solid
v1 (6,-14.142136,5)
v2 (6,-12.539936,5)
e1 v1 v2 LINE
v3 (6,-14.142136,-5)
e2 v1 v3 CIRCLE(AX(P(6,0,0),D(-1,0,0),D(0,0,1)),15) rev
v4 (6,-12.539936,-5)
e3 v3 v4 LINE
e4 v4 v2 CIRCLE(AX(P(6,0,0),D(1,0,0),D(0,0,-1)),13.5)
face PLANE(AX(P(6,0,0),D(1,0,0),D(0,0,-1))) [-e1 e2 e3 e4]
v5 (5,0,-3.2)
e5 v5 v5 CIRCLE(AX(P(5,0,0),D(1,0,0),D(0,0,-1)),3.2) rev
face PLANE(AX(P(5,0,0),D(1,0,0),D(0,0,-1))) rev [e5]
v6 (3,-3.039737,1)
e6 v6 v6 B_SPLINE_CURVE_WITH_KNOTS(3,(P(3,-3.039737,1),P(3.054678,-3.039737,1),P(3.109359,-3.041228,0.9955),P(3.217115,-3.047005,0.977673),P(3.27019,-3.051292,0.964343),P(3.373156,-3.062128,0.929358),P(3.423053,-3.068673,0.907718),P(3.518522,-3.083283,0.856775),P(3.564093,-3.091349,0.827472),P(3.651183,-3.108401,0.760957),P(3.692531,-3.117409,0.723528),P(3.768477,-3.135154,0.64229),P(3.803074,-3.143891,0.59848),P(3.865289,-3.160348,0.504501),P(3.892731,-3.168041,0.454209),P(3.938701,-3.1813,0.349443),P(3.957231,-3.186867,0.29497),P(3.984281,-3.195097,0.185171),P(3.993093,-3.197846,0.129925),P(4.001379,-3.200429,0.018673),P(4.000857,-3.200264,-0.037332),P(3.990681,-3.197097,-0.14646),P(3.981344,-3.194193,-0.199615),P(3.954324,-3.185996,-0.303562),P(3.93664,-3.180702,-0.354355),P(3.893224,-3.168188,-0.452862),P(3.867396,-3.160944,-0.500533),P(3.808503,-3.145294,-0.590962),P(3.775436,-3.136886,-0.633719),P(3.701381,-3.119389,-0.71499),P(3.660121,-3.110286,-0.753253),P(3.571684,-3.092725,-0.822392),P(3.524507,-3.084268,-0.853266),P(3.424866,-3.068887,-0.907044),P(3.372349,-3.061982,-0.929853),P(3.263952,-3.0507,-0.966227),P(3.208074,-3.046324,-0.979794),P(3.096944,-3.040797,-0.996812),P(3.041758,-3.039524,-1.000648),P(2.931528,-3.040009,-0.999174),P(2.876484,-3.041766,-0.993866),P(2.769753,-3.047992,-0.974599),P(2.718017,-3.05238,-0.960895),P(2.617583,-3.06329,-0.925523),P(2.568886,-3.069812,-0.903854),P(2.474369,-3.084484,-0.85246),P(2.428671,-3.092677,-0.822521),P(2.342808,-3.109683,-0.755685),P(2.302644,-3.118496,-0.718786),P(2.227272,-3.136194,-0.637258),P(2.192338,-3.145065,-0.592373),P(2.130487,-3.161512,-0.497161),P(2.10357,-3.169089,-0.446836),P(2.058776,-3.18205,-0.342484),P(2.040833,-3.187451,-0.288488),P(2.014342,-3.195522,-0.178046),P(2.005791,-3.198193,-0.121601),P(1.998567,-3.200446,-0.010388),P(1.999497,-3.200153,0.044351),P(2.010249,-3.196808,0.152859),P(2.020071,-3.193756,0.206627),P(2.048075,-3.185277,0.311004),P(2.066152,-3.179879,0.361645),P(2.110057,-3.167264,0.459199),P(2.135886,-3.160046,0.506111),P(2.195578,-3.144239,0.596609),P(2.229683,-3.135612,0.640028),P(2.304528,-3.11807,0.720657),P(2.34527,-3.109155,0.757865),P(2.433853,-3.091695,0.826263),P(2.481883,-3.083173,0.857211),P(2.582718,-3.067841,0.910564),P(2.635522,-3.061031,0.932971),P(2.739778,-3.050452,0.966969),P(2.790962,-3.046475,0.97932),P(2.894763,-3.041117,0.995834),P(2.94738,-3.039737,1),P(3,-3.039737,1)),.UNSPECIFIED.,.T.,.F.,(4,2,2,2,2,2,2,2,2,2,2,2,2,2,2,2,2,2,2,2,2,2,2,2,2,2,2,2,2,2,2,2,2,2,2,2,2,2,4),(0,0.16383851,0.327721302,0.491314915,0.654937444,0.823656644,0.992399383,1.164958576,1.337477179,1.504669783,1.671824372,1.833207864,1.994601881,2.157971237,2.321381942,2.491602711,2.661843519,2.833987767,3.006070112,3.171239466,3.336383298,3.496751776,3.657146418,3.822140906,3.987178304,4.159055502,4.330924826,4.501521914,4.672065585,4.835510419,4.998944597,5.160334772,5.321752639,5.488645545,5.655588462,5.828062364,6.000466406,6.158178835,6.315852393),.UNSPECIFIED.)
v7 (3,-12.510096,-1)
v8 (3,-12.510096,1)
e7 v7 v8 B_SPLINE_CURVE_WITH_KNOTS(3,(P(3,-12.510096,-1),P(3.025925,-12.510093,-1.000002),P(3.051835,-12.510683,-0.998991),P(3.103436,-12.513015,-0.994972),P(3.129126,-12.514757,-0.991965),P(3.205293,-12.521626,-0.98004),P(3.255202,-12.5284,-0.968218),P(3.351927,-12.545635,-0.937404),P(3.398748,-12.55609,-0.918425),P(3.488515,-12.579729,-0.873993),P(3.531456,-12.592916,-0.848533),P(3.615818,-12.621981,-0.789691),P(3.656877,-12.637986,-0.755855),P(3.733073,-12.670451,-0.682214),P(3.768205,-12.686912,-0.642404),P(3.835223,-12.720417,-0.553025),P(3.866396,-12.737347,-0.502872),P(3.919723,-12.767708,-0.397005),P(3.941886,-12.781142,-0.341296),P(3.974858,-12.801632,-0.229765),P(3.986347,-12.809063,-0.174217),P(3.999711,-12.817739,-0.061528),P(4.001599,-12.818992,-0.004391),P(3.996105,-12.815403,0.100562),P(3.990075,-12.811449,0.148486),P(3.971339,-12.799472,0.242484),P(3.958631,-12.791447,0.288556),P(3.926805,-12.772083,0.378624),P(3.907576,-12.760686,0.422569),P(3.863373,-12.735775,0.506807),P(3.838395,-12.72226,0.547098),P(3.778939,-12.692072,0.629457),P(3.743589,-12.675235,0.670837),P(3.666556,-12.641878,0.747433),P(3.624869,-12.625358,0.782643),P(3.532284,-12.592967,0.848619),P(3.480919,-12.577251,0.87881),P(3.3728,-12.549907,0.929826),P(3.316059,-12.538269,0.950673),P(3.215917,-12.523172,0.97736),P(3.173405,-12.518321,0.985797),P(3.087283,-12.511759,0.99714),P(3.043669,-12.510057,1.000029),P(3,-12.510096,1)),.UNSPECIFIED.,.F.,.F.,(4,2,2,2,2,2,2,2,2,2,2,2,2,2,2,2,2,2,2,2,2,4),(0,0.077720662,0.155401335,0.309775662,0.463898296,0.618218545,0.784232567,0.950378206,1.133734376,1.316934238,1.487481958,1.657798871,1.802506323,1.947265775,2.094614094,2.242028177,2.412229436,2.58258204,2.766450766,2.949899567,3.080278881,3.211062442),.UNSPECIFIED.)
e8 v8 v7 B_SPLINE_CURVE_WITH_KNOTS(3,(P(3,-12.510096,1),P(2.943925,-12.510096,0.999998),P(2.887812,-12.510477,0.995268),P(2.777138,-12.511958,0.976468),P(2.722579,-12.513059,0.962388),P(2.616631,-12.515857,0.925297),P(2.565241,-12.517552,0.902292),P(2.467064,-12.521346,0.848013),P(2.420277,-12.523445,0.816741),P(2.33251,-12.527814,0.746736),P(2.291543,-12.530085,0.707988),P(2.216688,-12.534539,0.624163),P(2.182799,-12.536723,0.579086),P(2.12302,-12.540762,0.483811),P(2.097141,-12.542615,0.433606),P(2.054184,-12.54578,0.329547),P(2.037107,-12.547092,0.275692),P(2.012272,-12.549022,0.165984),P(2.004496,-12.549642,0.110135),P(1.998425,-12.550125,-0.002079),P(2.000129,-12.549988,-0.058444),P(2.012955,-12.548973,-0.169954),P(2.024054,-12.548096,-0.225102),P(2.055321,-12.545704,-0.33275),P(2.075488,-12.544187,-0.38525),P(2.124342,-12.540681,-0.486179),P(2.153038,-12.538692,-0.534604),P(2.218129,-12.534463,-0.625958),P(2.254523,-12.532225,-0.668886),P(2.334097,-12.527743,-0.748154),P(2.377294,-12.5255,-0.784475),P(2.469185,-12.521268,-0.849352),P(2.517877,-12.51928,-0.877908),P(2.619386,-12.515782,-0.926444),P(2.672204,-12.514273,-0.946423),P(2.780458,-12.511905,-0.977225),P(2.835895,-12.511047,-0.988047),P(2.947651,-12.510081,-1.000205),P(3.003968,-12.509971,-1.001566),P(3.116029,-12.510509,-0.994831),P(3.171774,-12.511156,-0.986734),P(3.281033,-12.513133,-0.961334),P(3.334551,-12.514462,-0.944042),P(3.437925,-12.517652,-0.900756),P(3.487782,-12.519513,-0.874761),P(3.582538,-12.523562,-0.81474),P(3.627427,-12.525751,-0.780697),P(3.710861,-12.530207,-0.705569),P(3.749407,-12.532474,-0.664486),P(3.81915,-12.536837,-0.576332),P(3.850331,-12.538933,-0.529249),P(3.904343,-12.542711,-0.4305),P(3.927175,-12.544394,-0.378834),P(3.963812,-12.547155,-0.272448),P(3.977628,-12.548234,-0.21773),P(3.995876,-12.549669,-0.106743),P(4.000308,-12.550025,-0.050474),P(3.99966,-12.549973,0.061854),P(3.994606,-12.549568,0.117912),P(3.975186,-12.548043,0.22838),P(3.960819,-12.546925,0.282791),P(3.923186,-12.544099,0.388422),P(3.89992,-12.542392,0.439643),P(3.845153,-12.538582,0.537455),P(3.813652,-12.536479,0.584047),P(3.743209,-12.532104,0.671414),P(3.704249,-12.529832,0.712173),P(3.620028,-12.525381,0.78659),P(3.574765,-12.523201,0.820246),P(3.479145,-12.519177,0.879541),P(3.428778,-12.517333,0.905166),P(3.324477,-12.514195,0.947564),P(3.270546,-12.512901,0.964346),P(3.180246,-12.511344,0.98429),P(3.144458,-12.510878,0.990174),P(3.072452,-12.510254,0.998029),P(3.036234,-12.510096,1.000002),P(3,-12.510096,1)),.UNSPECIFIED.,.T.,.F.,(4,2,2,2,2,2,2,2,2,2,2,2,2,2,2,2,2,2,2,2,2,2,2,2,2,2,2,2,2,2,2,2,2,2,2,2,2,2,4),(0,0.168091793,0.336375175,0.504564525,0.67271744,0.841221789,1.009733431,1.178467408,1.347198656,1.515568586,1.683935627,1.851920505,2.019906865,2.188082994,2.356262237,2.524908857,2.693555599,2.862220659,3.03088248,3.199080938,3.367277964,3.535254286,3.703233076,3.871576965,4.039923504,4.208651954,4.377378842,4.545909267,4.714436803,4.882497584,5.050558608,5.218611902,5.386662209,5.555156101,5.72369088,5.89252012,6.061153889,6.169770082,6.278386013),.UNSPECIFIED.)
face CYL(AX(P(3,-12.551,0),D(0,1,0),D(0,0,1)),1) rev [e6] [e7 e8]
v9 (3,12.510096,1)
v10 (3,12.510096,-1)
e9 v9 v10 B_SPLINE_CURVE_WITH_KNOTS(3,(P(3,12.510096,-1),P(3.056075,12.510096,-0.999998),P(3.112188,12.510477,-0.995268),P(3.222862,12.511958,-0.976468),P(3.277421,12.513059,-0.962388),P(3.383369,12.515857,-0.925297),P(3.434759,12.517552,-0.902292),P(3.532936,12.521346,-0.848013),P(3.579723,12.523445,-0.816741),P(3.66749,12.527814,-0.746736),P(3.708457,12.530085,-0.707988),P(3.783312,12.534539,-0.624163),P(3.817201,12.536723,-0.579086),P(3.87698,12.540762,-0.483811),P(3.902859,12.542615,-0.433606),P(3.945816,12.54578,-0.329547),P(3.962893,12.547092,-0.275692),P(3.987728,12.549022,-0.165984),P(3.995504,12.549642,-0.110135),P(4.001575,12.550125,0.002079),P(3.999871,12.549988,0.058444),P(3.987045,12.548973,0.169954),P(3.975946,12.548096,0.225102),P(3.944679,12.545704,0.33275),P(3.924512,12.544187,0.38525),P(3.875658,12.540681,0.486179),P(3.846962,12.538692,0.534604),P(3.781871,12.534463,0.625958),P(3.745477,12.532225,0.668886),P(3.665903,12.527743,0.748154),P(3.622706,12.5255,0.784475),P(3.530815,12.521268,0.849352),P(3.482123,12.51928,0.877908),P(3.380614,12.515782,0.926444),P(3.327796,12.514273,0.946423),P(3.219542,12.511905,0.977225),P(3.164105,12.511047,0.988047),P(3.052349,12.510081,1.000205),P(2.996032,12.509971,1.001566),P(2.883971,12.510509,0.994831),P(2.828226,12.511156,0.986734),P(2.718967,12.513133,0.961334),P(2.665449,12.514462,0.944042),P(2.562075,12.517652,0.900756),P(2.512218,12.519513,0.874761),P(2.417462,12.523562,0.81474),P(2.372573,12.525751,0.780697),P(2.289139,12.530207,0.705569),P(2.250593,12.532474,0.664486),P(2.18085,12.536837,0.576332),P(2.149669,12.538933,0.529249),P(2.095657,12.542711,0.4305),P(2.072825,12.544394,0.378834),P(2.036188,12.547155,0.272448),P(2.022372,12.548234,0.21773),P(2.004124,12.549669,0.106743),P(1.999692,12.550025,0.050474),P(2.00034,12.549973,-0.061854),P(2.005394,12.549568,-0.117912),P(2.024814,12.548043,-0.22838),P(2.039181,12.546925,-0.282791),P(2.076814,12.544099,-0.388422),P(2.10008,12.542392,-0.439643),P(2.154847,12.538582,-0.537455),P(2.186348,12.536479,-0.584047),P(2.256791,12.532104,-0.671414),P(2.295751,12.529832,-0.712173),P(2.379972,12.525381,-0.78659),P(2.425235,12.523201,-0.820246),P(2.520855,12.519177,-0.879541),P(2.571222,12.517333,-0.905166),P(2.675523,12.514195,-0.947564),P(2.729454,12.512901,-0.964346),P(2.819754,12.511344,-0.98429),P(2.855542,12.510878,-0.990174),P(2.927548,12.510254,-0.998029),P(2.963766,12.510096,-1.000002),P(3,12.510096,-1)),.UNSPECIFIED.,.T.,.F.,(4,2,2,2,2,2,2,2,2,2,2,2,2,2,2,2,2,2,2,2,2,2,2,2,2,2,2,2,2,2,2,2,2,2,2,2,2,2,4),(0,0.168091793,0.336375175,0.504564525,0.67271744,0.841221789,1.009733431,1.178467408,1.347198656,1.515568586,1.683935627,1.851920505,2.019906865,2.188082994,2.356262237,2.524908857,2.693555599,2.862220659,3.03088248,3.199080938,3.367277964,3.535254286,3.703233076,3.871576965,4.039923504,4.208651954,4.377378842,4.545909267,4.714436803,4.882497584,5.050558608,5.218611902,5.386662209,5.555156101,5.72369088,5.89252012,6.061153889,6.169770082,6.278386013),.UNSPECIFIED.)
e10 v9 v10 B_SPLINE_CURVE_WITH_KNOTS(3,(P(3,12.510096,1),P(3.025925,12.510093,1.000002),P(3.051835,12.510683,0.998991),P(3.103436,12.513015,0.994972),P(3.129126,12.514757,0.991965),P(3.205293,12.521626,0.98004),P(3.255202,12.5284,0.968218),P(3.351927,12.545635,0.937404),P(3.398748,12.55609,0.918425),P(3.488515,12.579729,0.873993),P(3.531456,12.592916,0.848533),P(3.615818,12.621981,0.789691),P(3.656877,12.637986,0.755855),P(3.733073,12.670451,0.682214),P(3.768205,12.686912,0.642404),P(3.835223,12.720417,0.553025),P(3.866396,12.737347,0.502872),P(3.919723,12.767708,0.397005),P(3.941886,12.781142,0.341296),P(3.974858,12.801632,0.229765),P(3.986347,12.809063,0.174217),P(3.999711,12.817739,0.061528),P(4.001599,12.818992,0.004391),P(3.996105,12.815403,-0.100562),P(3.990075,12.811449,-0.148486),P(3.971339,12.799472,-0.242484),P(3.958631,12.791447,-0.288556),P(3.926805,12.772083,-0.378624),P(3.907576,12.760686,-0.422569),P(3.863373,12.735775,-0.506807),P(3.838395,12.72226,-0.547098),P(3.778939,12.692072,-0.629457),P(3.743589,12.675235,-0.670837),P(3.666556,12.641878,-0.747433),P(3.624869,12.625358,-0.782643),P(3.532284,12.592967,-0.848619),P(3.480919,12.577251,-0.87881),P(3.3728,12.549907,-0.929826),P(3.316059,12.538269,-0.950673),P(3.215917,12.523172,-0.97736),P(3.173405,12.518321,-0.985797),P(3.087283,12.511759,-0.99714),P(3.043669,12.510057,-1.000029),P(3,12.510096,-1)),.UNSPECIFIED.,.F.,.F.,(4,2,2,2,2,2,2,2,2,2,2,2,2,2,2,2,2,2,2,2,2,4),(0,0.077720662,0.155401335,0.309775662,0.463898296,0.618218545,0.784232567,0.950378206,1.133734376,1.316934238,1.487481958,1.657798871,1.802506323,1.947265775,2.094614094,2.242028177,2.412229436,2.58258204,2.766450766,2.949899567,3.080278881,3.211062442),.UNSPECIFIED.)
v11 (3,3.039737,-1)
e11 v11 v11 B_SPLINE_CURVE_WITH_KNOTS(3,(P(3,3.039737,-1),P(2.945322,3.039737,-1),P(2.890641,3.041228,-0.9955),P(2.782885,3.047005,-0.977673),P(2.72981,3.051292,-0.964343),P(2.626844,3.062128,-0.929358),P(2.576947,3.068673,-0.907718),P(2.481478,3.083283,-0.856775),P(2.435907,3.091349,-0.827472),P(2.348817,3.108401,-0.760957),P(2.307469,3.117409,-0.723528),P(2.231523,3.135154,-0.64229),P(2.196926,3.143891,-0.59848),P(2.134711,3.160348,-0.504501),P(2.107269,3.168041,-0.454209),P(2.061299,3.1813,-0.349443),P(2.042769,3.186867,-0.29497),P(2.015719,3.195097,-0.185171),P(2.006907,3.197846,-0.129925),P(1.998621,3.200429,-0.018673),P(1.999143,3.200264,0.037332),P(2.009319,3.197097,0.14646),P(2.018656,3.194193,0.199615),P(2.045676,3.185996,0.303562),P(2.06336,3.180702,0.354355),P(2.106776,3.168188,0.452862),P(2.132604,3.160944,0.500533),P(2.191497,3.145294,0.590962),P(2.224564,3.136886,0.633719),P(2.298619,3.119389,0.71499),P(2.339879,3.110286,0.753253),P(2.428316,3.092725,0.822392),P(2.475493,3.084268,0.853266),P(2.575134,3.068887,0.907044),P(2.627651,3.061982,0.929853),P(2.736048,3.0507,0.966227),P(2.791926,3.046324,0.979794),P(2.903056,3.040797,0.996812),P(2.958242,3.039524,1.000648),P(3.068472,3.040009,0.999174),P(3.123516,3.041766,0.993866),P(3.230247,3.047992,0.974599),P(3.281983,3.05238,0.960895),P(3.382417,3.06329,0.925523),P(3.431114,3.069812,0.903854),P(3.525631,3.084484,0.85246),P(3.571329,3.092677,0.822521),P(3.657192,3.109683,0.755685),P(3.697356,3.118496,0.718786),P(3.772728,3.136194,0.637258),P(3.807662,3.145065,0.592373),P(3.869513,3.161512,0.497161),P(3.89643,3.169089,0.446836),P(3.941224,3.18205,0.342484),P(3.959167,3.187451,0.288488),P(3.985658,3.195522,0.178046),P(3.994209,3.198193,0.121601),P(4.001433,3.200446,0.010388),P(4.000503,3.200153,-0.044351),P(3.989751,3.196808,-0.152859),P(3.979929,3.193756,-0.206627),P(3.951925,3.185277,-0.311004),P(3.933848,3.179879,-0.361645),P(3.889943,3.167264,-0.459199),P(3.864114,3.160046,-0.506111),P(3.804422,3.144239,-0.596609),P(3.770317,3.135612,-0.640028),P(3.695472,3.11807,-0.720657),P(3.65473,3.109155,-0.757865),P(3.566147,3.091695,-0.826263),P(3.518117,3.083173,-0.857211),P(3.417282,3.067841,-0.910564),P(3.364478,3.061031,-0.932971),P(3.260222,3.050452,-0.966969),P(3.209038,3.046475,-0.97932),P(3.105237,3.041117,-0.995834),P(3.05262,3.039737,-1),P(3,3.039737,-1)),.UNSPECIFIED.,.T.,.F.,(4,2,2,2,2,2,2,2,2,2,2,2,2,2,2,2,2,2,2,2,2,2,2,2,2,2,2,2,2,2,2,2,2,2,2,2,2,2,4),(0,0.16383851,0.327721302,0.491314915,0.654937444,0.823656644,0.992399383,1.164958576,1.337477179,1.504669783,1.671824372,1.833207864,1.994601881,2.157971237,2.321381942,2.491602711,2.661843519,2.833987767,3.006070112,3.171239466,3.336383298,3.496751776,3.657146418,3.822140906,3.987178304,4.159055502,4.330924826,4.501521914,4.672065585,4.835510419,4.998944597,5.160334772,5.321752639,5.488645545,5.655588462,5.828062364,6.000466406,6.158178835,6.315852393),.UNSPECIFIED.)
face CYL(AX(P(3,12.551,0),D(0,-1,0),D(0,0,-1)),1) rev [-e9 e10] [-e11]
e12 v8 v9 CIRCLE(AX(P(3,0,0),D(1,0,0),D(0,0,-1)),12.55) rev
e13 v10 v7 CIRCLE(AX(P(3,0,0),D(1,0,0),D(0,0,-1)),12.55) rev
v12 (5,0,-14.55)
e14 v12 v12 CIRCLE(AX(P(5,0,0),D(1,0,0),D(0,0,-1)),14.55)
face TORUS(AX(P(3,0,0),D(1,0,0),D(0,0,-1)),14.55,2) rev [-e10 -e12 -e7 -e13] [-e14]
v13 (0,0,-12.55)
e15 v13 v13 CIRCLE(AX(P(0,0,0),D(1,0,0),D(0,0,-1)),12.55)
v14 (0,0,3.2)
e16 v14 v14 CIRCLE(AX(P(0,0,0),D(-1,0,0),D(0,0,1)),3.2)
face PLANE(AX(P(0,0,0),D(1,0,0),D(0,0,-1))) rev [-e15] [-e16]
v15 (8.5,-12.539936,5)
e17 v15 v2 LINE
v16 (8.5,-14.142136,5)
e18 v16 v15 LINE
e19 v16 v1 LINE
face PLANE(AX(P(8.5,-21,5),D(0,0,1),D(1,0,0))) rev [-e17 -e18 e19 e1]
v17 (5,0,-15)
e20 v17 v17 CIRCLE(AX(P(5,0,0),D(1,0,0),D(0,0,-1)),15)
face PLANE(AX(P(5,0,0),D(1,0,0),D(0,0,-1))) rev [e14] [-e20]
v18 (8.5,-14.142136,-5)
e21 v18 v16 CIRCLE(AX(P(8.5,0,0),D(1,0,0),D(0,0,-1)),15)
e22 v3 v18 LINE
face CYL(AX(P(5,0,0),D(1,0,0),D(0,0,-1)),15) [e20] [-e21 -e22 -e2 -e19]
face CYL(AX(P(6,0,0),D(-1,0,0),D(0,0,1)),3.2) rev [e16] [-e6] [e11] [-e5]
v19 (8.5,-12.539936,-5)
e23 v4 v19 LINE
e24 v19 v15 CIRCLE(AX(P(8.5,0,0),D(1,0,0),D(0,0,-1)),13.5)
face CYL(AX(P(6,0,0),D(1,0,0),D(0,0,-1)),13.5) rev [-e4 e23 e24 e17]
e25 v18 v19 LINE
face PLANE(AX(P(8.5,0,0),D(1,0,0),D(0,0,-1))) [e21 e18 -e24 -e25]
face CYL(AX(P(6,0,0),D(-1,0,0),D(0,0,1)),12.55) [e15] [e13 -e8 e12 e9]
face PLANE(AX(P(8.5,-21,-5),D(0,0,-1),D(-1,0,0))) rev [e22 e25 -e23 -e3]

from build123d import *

# Parameters (mm, degrees)
SKETCH_1_R                      = 12.55
EXTRUDE_1_DEPTH                 = 6
SKETCH_2_R                      = 3.2
CUT_EXTRUDE_1_DEPTH             = 6
CUT_EXTRUDE_2_REACH             = 20.735
SKETCH_3_R                      = 1
CUT_EXTRUDE_2_DIRECTION_2_REACH = 20.735
EXTRUDE_2_DEPTH                 = 2.5
EXTRUDE_2_DEPTH_BACK            = 1
SKETCH_4_R                      = 15
SKETCH_5_R                      = 13.5
CUT_EXTRUDE_3_DEPTH             = 2.5
FILLET_2_R                      = 2
SKETCH_7_W                      = 2.5
SKETCH_7_H                      = 10
CUT_EXTRUDE_4_DEPTH             = 21


with BuildPart() as part:
    # 草图1 → 凸台-拉伸1 (new body)
    with BuildSketch(Plane(origin=(0, 0, 0), x_dir=(0, 0, -1), z_dir=(1, 0, 0))):
        Circle(SKETCH_1_R)
    extrude(amount=EXTRUDE_1_DEPTH)

    # 草图2 → 切除-拉伸1 (cut)
    with BuildSketch(Plane.ZY):
        Circle(SKETCH_2_R)
    extrude(amount=-CUT_EXTRUDE_1_DEPTH, mode=Mode.SUBTRACT)

    # 草图3 → 切除-拉伸2 (cut, up to next)
    with BuildSketch(Plane(origin=(0, 0, 0), x_dir=(1, 0, 0), z_dir=(0, 1, 0)), mode=Mode.PRIVATE) as cut_extrude_2_sk1:
        with Locations(Location((3, 0, 0), (0, 0, 270))):
            Circle(SKETCH_3_R)
    cut_extrude_2_tool1 = extrude(cut_extrude_2_sk1.sketch, amount=-CUT_EXTRUDE_2_REACH, mode=Mode.PRIVATE) & part.part
    add(cut_extrude_2_tool1.solids().sort_by_distance((3, 0, 0))[0], mode=Mode.SUBTRACT)

    # 草图3 → 切除-拉伸2 direction 2 (cut, up to next)
    with BuildSketch(Plane(origin=(0, 0, 0), x_dir=(1, 0, 0), z_dir=(0, 1, 0)), mode=Mode.PRIVATE) as cut_extrude_2_direction_2_sk1:
        with Locations(Location((3, 0, 0), (0, 0, 270))):
            Circle(SKETCH_3_R)
    cut_extrude_2_direction_2_tool1 = extrude(cut_extrude_2_direction_2_sk1.sketch, amount=CUT_EXTRUDE_2_DIRECTION_2_REACH, mode=Mode.PRIVATE) & part.part
    add(cut_extrude_2_direction_2_tool1.solids().sort_by_distance((3, 0, 0))[0], mode=Mode.SUBTRACT)

    # 草图4 → 凸台-拉伸2 (add, two sides: drawn at the far end of the back side and taken through both)
    with BuildSketch(Plane(origin=(6, 0, 0), x_dir=(0, 0, -1), z_dir=(1, 0, 0)).offset(-EXTRUDE_2_DEPTH_BACK)):
        Circle(SKETCH_4_R)
    extrude(amount=EXTRUDE_2_DEPTH + EXTRUDE_2_DEPTH_BACK)

    # 草图5 → 切除-拉伸3 (cut)
    with BuildSketch(Plane(origin=(8.5, 0, 0), x_dir=(0, 0, -1), z_dir=(1, 0, 0))):
        Circle(SKETCH_5_R)
    extrude(amount=-CUT_EXTRUDE_3_DEPTH, mode=Mode.SUBTRACT)

    # 圆角2
    # the kernel refuses this fillet: 2 mm, written as the material it adds along each edge
    with BuildSketch(Plane(origin=(5, 0, 0), x_dir=(0, 0, -1), z_dir=(0, 1, 0))) as fillet_2_piece_1_section:
        with BuildLine():
            CenterArc((12.55 + FILLET_2_R, FILLET_2_R), FILLET_2_R, 180, 90)
            Line((12.55 + FILLET_2_R, 0), (12.55, 0))
            Line((12.55, 0), (12.55, FILLET_2_R))
        make_face()
    fillet_2_piece_1 = revolve(axis=Axis((5, 0, 0), (-1, 0, 0)), mode=Mode.PRIVATE)
    fillet_2_piece_1 = fillet_2_piece_1 - Plane(origin=(3, 0, 0), x_dir=(0, 0, 1), z_dir=(0, -1, 0)) * Cylinder(1, 59, mode=Mode.PRIVATE)
    add(fillet_2_piece_1)

    # 草图7 → 切除-拉伸4 (cut)
    with BuildSketch(Plane(origin=(0, 0, 0), x_dir=(1, 0, 0), z_dir=(0, 1, 0))):
        with Locations((7.25, 0)):
            Rectangle(SKETCH_7_W, SKETCH_7_H)
    extrude(amount=-CUT_EXTRUDE_4_DEPTH, mode=Mode.SUBTRACT)


solid = part.part
